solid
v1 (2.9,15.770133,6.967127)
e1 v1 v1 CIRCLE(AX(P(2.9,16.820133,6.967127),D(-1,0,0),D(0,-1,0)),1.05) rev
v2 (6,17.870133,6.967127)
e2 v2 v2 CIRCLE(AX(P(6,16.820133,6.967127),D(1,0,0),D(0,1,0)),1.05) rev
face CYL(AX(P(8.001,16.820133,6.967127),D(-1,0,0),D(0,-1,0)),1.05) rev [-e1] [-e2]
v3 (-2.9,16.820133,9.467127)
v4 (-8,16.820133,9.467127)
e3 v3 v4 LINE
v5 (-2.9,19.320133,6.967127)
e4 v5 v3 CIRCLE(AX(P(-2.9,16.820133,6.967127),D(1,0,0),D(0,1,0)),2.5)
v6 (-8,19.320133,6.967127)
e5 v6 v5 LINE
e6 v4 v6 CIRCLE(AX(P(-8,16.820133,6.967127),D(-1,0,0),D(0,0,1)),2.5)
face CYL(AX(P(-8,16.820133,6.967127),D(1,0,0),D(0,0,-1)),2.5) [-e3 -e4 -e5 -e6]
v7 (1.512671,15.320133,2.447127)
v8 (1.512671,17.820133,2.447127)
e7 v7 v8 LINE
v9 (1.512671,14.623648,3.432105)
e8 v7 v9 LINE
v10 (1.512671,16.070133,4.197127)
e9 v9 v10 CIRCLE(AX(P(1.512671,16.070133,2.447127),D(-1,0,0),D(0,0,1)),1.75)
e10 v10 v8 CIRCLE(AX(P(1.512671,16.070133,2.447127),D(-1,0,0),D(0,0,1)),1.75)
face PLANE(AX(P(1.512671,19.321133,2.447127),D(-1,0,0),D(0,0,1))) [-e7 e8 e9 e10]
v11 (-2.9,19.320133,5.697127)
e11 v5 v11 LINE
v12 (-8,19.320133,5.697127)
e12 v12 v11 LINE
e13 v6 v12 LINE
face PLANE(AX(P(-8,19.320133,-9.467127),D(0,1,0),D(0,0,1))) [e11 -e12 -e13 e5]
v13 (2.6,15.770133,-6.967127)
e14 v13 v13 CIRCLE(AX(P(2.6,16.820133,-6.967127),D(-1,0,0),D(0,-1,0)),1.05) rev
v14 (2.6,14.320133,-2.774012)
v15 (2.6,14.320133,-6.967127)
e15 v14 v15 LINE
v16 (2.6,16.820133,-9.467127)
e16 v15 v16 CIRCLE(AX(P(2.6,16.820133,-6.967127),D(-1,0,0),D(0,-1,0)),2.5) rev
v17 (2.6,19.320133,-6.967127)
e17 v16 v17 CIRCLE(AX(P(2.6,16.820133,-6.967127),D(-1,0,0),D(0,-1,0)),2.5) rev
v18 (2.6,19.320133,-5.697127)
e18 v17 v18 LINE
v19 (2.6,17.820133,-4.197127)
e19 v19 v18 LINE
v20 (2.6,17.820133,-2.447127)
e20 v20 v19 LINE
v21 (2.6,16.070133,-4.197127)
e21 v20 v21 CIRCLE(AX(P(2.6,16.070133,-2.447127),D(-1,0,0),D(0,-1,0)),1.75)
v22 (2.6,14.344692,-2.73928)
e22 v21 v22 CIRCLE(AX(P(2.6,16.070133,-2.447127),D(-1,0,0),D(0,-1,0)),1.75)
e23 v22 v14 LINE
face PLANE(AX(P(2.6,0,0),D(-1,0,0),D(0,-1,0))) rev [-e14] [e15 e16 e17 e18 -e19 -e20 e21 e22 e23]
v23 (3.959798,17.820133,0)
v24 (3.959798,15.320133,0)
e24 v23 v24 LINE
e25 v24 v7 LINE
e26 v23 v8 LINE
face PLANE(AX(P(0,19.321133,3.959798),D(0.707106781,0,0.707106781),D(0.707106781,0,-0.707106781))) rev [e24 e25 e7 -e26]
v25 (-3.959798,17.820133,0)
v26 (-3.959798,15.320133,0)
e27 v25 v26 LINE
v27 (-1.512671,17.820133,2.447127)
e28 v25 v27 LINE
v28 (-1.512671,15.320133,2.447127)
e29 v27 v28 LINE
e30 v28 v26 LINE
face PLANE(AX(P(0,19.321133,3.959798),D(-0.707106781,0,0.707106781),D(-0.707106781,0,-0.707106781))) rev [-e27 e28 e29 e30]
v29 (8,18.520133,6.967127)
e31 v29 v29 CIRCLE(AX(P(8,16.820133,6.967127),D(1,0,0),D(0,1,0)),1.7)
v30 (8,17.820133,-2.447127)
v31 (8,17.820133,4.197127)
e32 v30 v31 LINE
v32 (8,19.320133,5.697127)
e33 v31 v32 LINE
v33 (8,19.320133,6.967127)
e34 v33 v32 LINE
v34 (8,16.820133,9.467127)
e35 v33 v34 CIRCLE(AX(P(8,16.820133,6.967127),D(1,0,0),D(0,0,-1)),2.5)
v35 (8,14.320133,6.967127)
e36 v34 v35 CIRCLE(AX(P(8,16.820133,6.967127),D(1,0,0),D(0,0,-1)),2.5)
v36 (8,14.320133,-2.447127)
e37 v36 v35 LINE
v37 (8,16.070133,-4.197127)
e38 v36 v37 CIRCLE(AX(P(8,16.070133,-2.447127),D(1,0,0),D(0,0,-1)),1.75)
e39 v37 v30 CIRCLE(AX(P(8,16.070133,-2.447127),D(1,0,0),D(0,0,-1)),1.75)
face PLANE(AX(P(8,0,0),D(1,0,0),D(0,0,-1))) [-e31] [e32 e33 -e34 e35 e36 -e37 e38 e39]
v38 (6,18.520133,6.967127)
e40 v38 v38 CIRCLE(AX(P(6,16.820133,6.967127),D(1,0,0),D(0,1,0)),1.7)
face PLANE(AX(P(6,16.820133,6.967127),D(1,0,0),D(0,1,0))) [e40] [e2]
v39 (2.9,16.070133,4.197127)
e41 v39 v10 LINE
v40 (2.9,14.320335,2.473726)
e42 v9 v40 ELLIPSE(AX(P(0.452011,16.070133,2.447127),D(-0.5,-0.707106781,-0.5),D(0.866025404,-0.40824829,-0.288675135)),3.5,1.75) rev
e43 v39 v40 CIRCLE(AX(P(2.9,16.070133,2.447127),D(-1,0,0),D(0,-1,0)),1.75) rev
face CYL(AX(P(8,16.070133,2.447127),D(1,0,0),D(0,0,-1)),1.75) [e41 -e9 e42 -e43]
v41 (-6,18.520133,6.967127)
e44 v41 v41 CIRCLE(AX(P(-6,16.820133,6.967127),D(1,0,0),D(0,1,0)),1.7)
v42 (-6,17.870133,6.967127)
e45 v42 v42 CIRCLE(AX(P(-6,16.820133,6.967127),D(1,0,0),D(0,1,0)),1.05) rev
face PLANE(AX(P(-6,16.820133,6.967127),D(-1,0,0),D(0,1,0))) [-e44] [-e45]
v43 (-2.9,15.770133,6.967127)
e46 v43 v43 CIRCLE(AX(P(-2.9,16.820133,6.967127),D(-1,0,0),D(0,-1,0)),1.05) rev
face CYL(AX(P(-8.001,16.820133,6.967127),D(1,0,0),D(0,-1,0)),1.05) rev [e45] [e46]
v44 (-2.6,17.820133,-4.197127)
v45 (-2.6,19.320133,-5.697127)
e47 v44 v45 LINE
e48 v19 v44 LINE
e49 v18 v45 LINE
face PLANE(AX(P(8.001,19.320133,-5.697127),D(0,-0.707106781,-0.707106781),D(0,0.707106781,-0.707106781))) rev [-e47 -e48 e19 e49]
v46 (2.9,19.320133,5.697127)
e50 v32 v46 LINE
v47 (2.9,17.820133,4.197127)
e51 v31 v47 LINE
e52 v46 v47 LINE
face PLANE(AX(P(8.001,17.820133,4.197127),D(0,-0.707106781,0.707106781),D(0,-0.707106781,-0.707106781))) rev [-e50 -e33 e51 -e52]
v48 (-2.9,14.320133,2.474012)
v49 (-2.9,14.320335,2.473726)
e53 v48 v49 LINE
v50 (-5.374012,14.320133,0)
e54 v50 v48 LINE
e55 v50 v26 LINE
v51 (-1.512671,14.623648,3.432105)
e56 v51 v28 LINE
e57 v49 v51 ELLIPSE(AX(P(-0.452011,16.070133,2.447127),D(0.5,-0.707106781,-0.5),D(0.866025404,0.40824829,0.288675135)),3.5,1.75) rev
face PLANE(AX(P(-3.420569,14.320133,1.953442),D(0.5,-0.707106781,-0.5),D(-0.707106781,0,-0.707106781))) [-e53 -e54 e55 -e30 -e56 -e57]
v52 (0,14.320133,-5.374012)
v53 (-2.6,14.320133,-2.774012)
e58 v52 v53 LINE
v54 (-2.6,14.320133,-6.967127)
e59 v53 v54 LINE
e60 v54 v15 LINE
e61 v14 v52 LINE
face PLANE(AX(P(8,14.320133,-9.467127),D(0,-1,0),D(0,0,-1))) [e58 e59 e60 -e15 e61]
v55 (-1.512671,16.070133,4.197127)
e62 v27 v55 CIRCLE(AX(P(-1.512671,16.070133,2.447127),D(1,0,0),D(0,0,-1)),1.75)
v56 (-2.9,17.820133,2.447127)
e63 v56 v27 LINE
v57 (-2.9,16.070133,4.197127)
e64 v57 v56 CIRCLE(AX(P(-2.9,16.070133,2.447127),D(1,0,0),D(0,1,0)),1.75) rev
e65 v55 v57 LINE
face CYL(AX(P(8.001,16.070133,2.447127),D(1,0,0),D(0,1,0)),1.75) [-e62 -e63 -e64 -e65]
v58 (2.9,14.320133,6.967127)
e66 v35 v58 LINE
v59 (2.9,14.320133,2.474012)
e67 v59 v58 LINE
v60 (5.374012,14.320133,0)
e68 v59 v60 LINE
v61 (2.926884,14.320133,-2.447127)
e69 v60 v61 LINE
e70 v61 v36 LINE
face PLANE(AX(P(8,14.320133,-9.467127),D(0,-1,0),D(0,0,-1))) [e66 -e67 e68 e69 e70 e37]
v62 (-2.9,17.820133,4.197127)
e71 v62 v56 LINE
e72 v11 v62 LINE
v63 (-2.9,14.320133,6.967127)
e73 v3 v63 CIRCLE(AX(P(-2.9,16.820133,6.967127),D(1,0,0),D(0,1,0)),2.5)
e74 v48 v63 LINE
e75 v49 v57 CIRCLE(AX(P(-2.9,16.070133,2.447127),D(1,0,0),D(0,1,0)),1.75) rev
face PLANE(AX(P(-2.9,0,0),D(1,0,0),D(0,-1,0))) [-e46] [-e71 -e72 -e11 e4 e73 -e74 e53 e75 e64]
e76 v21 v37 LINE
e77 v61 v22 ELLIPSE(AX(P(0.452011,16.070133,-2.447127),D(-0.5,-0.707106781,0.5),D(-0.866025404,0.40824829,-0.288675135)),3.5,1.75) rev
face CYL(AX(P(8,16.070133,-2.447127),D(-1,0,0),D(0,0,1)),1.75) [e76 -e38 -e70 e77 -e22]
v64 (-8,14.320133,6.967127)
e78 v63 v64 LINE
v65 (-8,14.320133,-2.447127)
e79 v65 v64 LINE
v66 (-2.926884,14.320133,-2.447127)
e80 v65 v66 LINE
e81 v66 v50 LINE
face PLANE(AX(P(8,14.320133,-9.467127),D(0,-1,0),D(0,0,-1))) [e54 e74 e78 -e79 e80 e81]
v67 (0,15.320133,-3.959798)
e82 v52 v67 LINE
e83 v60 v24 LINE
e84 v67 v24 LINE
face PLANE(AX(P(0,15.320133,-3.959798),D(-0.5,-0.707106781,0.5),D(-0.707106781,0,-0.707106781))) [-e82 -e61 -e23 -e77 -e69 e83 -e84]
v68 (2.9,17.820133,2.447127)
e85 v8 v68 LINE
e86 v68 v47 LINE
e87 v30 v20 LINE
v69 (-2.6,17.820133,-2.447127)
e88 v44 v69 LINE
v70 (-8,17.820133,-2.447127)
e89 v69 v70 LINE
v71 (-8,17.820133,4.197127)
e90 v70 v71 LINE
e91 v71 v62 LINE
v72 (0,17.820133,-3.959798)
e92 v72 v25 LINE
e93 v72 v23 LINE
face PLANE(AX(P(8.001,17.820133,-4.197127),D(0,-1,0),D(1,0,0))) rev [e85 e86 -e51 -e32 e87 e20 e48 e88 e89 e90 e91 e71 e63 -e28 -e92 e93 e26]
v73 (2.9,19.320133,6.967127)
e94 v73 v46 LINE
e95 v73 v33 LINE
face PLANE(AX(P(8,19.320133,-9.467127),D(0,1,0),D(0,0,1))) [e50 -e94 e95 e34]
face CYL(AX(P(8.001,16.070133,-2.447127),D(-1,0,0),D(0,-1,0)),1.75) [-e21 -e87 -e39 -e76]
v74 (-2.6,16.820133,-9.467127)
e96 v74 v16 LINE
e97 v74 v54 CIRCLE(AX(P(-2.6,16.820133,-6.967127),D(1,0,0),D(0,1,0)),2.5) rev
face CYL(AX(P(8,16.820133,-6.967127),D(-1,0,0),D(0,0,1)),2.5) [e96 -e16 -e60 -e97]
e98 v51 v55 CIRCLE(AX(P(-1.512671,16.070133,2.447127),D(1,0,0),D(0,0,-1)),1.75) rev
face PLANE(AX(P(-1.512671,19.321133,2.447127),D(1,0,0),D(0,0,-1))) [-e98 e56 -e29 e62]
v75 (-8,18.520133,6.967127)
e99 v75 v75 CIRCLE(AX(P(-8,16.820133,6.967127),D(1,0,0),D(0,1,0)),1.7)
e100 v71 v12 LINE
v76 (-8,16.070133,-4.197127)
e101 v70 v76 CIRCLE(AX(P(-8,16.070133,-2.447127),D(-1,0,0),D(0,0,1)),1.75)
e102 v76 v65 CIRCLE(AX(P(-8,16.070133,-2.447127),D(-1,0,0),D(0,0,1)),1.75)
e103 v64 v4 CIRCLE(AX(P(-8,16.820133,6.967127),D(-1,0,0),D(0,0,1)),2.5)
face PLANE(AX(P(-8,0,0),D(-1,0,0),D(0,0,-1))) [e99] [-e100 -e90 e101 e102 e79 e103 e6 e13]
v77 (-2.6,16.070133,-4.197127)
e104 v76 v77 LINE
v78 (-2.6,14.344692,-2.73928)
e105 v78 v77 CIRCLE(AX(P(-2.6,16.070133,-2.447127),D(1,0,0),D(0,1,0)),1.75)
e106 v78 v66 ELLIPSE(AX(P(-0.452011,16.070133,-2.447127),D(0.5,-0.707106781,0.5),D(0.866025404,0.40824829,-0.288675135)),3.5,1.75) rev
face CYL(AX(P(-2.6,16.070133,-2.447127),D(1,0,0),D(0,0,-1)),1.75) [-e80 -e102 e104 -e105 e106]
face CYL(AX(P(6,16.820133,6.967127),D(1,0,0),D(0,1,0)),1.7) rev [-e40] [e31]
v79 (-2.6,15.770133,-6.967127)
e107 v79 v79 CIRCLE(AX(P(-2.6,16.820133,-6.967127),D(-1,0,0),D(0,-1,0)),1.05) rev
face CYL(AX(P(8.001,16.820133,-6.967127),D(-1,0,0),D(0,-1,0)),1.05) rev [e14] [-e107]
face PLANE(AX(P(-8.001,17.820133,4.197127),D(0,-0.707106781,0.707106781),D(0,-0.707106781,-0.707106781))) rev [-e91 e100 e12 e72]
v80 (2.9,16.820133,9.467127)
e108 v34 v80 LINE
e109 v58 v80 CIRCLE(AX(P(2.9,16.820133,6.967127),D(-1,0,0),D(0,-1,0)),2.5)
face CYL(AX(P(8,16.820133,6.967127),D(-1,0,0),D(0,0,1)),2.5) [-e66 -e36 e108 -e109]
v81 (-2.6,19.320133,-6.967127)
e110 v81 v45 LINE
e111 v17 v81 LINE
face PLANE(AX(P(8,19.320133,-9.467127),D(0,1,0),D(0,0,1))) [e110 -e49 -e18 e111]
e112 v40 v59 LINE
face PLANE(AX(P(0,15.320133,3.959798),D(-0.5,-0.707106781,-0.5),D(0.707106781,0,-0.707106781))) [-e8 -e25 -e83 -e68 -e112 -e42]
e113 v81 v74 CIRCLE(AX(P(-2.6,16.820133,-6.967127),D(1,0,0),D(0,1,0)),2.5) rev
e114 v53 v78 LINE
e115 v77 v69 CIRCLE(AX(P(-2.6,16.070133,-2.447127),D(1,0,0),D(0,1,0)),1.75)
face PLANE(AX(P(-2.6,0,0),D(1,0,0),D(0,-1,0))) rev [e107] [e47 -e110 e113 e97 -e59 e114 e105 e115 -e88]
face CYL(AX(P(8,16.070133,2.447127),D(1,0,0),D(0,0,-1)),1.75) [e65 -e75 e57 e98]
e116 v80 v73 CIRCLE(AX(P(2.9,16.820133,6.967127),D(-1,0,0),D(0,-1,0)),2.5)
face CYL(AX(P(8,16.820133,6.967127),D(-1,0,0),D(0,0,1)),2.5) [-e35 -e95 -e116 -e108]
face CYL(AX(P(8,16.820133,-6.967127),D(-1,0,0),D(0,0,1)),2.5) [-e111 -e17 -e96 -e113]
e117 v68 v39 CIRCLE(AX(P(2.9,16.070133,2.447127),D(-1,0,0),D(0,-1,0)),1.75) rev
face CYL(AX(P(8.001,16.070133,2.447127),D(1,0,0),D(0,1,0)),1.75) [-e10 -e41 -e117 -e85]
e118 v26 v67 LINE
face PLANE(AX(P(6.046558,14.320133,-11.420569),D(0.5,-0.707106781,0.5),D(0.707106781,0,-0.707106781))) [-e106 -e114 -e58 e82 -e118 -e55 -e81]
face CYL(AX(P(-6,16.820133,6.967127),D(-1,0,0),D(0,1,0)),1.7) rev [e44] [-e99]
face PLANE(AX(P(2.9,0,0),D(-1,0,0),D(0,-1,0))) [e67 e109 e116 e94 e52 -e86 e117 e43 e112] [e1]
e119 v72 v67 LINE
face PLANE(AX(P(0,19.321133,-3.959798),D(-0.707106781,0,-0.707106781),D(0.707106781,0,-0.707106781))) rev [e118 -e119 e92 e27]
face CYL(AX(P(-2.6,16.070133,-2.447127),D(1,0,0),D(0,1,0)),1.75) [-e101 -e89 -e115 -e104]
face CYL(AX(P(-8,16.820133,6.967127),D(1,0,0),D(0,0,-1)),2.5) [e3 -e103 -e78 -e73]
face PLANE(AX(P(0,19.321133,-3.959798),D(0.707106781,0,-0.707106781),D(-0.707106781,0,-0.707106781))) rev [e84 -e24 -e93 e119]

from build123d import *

# Parameters (mm, degrees)
SKETCH3_W           = 18.934254216
SKETCH3_H           = 5
BOSS_EXTRUDE1_DEPTH = 8
CUT_EXTRUDE1_REACH  = 24.954
SKETCH5_R           = 1.05
SKETCH4_W           = 5.27
SKETCH4_H           = 5
CUT_EXTRUDE2_DEPTH  = 2.9
SKETCH6_W           = 5.27
SKETCH6_H           = 5
CUT_EXTRUDE3_DEPTH  = 5.4
CUT_EXTRUDE5_REACH  = 15.365
CUT_EXTRUDE6_REACH  = 24.954
SKETCH10_R          = 1.7
CUT_EXTRUDE9_DEPTH  = 2
FILLET1_R           = 2.5
FILLET2_R           = 1.75
CUT_EXTRUDE7_REACH  = 15.365
SKETCH8_W           = 3.025341734
SKETCH8_H           = 1.75
CHAMFER1_SIZE       = 1


with BuildPart() as part:
    # Sketch3 → Boss-Extrude1 (new body)
    with BuildSketch(Plane.ZY):
        with Locations((0, 16.820132754)):
            Rectangle(SKETCH3_W, SKETCH3_H)
    extrude(amount=-BOSS_EXTRUDE1_DEPTH)

    # Sketch5 → Cut-Extrude1 (cut, up to next)
    with BuildSketch(Plane.ZY, mode=Mode.PRIVATE) as cut_extrude1_sk1:
        with Locations(Location((6.967127108, 16.820132754, 0), (0, 0, 270))):
            Circle(SKETCH5_R)
    cut_extrude1_tool1 = extrude(cut_extrude1_sk1.sketch, amount=-CUT_EXTRUDE1_REACH, mode=Mode.PRIVATE) & part.part
    # Sketch5 → Cut-Extrude1 (cut, up to next)
    with BuildSketch(Plane.ZY, mode=Mode.PRIVATE) as cut_extrude1_sk2:
        with Locations(Location((-6.967127108, 16.820132754, 0), (0, 0, 270))):
            Circle(SKETCH5_R)
    cut_extrude1_tool2 = extrude(cut_extrude1_sk2.sketch, amount=-CUT_EXTRUDE1_REACH, mode=Mode.PRIVATE) & part.part
    add(cut_extrude1_tool1.solids().sort_by_distance((0, 16.820133, 6.967127))[0], mode=Mode.SUBTRACT)
    add(cut_extrude1_tool2.solids().sort_by_distance((0, 16.820133, -6.967127))[0], mode=Mode.SUBTRACT)

    # Sketch4 → Cut-Extrude2 (cut)
    with BuildSketch(Plane.ZY):
        with Locations((6.832127108, 16.820132754)):
            Rectangle(SKETCH4_W, SKETCH4_H)
    extrude(amount=-CUT_EXTRUDE2_DEPTH, mode=Mode.SUBTRACT)

    # Sketch6 → Cut-Extrude3 (cut)
    with BuildSketch(Plane(origin=(8, 0, 0), x_dir=(0, 0, -1), z_dir=(1, 0, 0))):
        with Locations((6.832127108, 16.820132754)):
            Rectangle(SKETCH6_W, SKETCH6_H)
    extrude(amount=-CUT_EXTRUDE3_DEPTH, mode=Mode.SUBTRACT)

    # Sketch1 → Cut-Extrude5 (cut, up to next)
    with BuildSketch(Plane(origin=(0, 14.320132754, 0), x_dir=(-1, 0, 0), z_dir=(0, -1, 0)), mode=Mode.PRIVATE) as cut_extrude5_sk1:
        Polygon((3.959797975, 0), (0, -3.959797975), (-3.959797975, 0), (0, 3.959797975), align=None)
    cut_extrude5_tool1 = extrude(cut_extrude5_sk1.sketch, amount=-CUT_EXTRUDE5_REACH, mode=Mode.PRIVATE) & part.part
    add(cut_extrude5_tool1.solids().sort_by_distance((0, 14.320133, 0))[0], mode=Mode.SUBTRACT)

    # Sketch7 → Cut-Extrude6 (cut, up to next)
    with BuildSketch(Plane.ZY, mode=Mode.PRIVATE) as cut_extrude6_sk1:
        Polygon((-4.197127108, 17.820132754), (4.197127108, 17.820132754), (5.697127108, 19.320132754), (-5.697127108, 19.320132754), align=None)
    cut_extrude6_tool1 = extrude(cut_extrude6_sk1.sketch, amount=-CUT_EXTRUDE6_REACH, mode=Mode.PRIVATE) & part.part
    add(cut_extrude6_tool1.solids().sort_by_distance((0, 18.608034, 0))[0], mode=Mode.SUBTRACT)

    # Sketch10 → Cut-Extrude9 (cut)
    with BuildSketch(Plane(origin=(8, 0, 0), x_dir=(0, 0, -1), z_dir=(1, 0, 0))):
        with Locations(Location((-6.967127108, 16.820132754, 0), (0, 0, 90))):
            Circle(SKETCH10_R)
    extrude(amount=-CUT_EXTRUDE9_DEPTH, mode=Mode.SUBTRACT)

    # Mirror2: part across plane


with BuildPart() as part_1:
    add(part.part)
    add(part.part.mirror(Plane(origin=(0, 0, 0), x_dir=(0, 0, 1), z_dir=(1, 0, 0))))

    # Fillet1
    # the kernel refuses this fillet: 2.5 mm, written as the material it takes off along each edge
    with BuildSketch(Plane(origin=(3.35, 14.320132754, 9.467127108), x_dir=(0, 0, -1), z_dir=(-1, 0, 0)), Plane(origin=(-3.35, 19.320132754, 9.467127108), x_dir=(0, 0, -1), z_dir=(1, 0, 0))) as fillet1_piece_1:
        with BuildLine():
            CenterArc((FILLET1_R, -FILLET1_R), FILLET1_R, 90, 90)
            Line((0, -FILLET1_R), (0, 0))
            Line((0, 0), (FILLET1_R, 0))
        make_face()
    extrude(amount=17.6, mode=Mode.SUBTRACT)
    with BuildSketch(Plane(origin=(3.35, 19.320132754, 9.467127108), x_dir=(0, 0, -1), z_dir=(-1, 0, 0)), Plane(origin=(-3.35, 14.320132754, 9.467127108), x_dir=(0, 0, -1), z_dir=(1, 0, 0))) as fillet1_piece_2:
        with BuildLine():
            CenterArc((FILLET1_R, FILLET1_R), FILLET1_R, 180, 90)
            Line((0, FILLET1_R), (0, 0))
            Line((0, 0), (FILLET1_R, 0))
        make_face()
    extrude(amount=17.6, mode=Mode.SUBTRACT)
    with BuildSketch(Plane(origin=(-8.85, 14.320132754, -9.467127108), x_dir=(0, 0, 1), z_dir=(1, 0, 0))) as fillet1_piece_3:
        with BuildLine():
            CenterArc((FILLET1_R, -FILLET1_R), FILLET1_R, 90, 90)
            Line((0, -FILLET1_R), (0, 0))
            Line((0, 0), (FILLET1_R, 0))
        make_face()
    extrude(amount=17.7, mode=Mode.SUBTRACT)
    with BuildSketch(Plane(origin=(-8.85, 19.320132754, -9.467127108), x_dir=(0, 0, 1), z_dir=(1, 0, 0))) as fillet1_piece_4:
        with BuildLine():
            CenterArc((FILLET1_R, FILLET1_R), FILLET1_R, 180, 90)
            Line((0, FILLET1_R), (0, 0))
            Line((0, 0), (FILLET1_R, 0))
        make_face()
    extrude(amount=17.7, mode=Mode.SUBTRACT)

    # Fillet2
    # the kernel refuses this fillet: 1.75 mm, written as the material it takes off along each edge
    with BuildSketch(Plane(origin=(2.9, 14.320132754, 4.197127108), x_dir=(0, 0, -1), z_dir=(-1, 0, 0))) as fillet2_piece_1:
        with BuildLine():
            CenterArc((FILLET2_R, -FILLET2_R), FILLET2_R, 90, 90)
            Line((0, -FILLET2_R), (0, 0))
            Line((0, 0), (FILLET2_R, 0))
        make_face()
    extrude(amount=5.8, mode=Mode.SUBTRACT)
    with BuildSketch(Plane(origin=(2.9, 17.820132754, 4.197127108), x_dir=(0, 0, -1), z_dir=(-1, 0, 0))) as fillet2_piece_2:
        with BuildLine():
            CenterArc((FILLET2_R, FILLET2_R), FILLET2_R, 180, 90)
            Line((0, FILLET2_R), (0, 0))
            Line((0, 0), (FILLET2_R, 0))
        make_face()
    extrude(amount=5.8, mode=Mode.SUBTRACT)
    with BuildSketch(Plane(origin=(12.375, 14.320132754, -4.197127108), x_dir=(0, 0, 1), z_dir=(-1, 0, 0)), Plane(origin=(2.6, 17.820132754, -4.197127108), x_dir=(0, 0, 1), z_dir=(1, 0, 0))) as fillet2_piece_3:
        with BuildLine():
            CenterArc((FILLET2_R, FILLET2_R), FILLET2_R, 180, 90)
            Line((0, FILLET2_R), (0, 0))
            Line((0, 0), (FILLET2_R, 0))
        make_face()
    extrude(amount=9.775, mode=Mode.SUBTRACT)
    with BuildSketch(Plane(origin=(-12.375, 14.320132754, -4.197127108), x_dir=(0, 0, 1), z_dir=(1, 0, 0)), Plane(origin=(-2.6, 17.820132754, -4.197127108), x_dir=(0, 0, 1), z_dir=(-1, 0, 0))) as fillet2_piece_4:
        with BuildLine():
            CenterArc((FILLET2_R, -FILLET2_R), FILLET2_R, 90, 90)
            Line((0, -FILLET2_R), (0, 0))
            Line((0, 0), (FILLET2_R, 0))
        make_face()
    extrude(amount=9.775, mode=Mode.SUBTRACT)

    # Sketch8 → Cut-Extrude7 (cut, up to next)
    with BuildSketch(Plane(origin=(0, 14.320132754, 0), x_dir=(1, 0, 0), z_dir=(0, 1, 0)), mode=Mode.PRIVATE) as cut_extrude7_sk1:
        with Locations((0, -3.322127108)):
            Rectangle(SKETCH8_W, SKETCH8_H)
    cut_extrude7_tool1 = extrude(cut_extrude7_sk1.sketch, amount=CUT_EXTRUDE7_REACH, mode=Mode.PRIVATE) & part_1.part
    add(cut_extrude7_tool1.solids().sort_by_distance((0, 14.320133, 3.322127))[0], mode=Mode.SUBTRACT)

    # Chamfer1
    # the kernel refuses this chamfer: 1 mm, written as the material it takes off along each edge
    with BuildSketch(Plane(origin=(0.305783613, 14.320132754, 4.265581587), x_dir=(-0.7068394360706736, -0.027495876610585612, 0.7068394360706735), z_dir=(-0.7071067811865476, 0, -0.7071067811865476))) as chamfer1_piece_1:
        Polygon((CHAMFER1_SIZE * 0.999621916911, CHAMFER1_SIZE * 0.0274958766106), (-CHAMFER1_SIZE * 0.0274958766106, CHAMFER1_SIZE * 0.999621916911), (0, 0), align=None)
    extrude(amount=6.032443332, mode=Mode.SUBTRACT)
    with BuildSketch(Plane(origin=(-0.305783613, 14.320132754, 4.265581587), x_dir=(0.7068394360706735, -0.027495876610585612, 0.7068394360706735), z_dir=(0.7071067811865476, 0, -0.7071067811865476))) as chamfer1_piece_2:
        Polygon((CHAMFER1_SIZE * 0.999621916911, -CHAMFER1_SIZE * 0.0274958766106), (-CHAMFER1_SIZE * 0.0274958766106, -CHAMFER1_SIZE * 0.999621916911), (0, 0), align=None)
    extrude(amount=6.032443332, mode=Mode.SUBTRACT)
    with BuildSketch(Plane(origin=(3.959797975, 14.320132754, 0), x_dir=(0.7068394360706735, -0.027495876610590834, -0.7068394360706735), z_dir=(-0.7071067811865476, 0, -0.7071067811865476))) as chamfer1_piece_3:
        Polygon((CHAMFER1_SIZE * 0.999621916911, -CHAMFER1_SIZE * 0.0274958766106), (-CHAMFER1_SIZE * 0.0274958766106, -CHAMFER1_SIZE * 0.999621916911), (0, 0), align=None)
    extrude(amount=5.6, mode=Mode.SUBTRACT)
    with BuildSketch(Plane(origin=(-3.959797975, 14.320132754, 0), x_dir=(-0.7068394360706735, -0.027495876610590834, -0.7068394360706735), z_dir=(0.7071067811865476, 0, -0.7071067811865476))) as chamfer1_piece_4:
        Polygon((CHAMFER1_SIZE * 0.999621916911, CHAMFER1_SIZE * 0.0274958766106), (-CHAMFER1_SIZE * 0.0274958766106, CHAMFER1_SIZE * 0.999621916911), (0, 0), align=None)
    extrude(amount=5.6, mode=Mode.SUBTRACT)
    with BuildSketch(Plane(origin=(-5.778252454, 14.320132754, 1.81845448), x_dir=(-0.7068394360706735, -0.027495876610585616, -0.7068394360706735), z_dir=(0.7071067811865476, 0, -0.7071067811865476))) as chamfer1_piece_5a_section:
        Polygon((CHAMFER1_SIZE * 0.999621916911, CHAMFER1_SIZE * 0.0274958766106), (-CHAMFER1_SIZE * 0.0274958766106, CHAMFER1_SIZE * 0.999621916911), (0, 0), align=None)
    chamfer1_piece_5a = extrude(amount=8.171682988, mode=Mode.PRIVATE)
    chamfer1_piece_5a = split(chamfer1_piece_5a, bisect_by=Plane(origin=(-4.192997285, 14.649926381, -0.23319931), z_dir=(-0.7071067811865476, 0, 0.7071067811865476)), keep=Keep.TOP, mode=Mode.PRIVATE)
    with BuildSketch(Plane(origin=(0.305783613, 14.320132754, 4.265581587), x_dir=(-0.7068394360706736, -0.027495876610585612, 0.7068394360706735), z_dir=(-0.7071067811865476, 0, -0.7071067811865476))) as chamfer1_piece_5b_section:
        Polygon((CHAMFER1_SIZE * 0.999621916911, CHAMFER1_SIZE * 0.0274958766106), (-CHAMFER1_SIZE * 0.0274958766106, CHAMFER1_SIZE * 0.999621916911), (0, 0), align=None)
    chamfer1_piece_5b = extrude(amount=8.60412632, mode=Mode.PRIVATE)
    chamfer1_piece_5b = split(chamfer1_piece_5b, bisect_by=Plane(origin=(-4.192997285, 14.649926381, 0.23319931), z_dir=(-0.7071067811865476, 0, -0.7071067811865476)), keep=Keep.TOP, mode=Mode.PRIVATE)
    chamfer1_piece_5 = chamfer1_piece_5a & chamfer1_piece_5b
    add(chamfer1_piece_5, mode=Mode.SUBTRACT)
    with BuildSketch(Plane(origin=(-0.305783613, 14.320132754, 4.265581587), x_dir=(0.7068394360706735, -0.027495876610585612, 0.7068394360706735), z_dir=(0.7071067811865476, 0, -0.7071067811865476))) as chamfer1_piece_6a_section:
        Polygon((CHAMFER1_SIZE * 0.999621916911, -CHAMFER1_SIZE * 0.0274958766106), (-CHAMFER1_SIZE * 0.0274958766106, -CHAMFER1_SIZE * 0.999621916911), (0, 0), align=None)
    chamfer1_piece_6a = extrude(amount=8.60412632, mode=Mode.PRIVATE)
    chamfer1_piece_6a = split(chamfer1_piece_6a, bisect_by=Plane(origin=(4.192997285, 14.649926381, 0.23319931), z_dir=(0.7071067811865476, 0, -0.7071067811865476)), keep=Keep.TOP, mode=Mode.PRIVATE)
    with BuildSketch(Plane(origin=(5.778252454, 14.320132754, 1.81845448), x_dir=(0.7068394360706736, -0.027495876610585605, -0.7068394360706736), z_dir=(-0.7071067811865476, 0, -0.7071067811865476))) as chamfer1_piece_6b_section:
        Polygon((CHAMFER1_SIZE * 0.999621916911, -CHAMFER1_SIZE * 0.0274958766106), (-CHAMFER1_SIZE * 0.0274958766106, -CHAMFER1_SIZE * 0.999621916911), (0, 0), align=None)
    chamfer1_piece_6b = extrude(amount=8.171682988, mode=Mode.PRIVATE)
    chamfer1_piece_6b = split(chamfer1_piece_6b, bisect_by=Plane(origin=(4.192997285, 14.649926381, -0.23319931), z_dir=(0.7071067811865476, 0, 0.7071067811865476)), keep=Keep.TOP, mode=Mode.PRIVATE)
    chamfer1_piece_6 = chamfer1_piece_6a & chamfer1_piece_6b
    add(chamfer1_piece_6, mode=Mode.SUBTRACT)
    with BuildSketch(Plane(origin=(3.959797975, 14.320132754, 0), x_dir=(0.7068394360706735, -0.027495876610590834, -0.7068394360706735), z_dir=(-0.7071067811865476, 0, -0.7071067811865476))) as chamfer1_piece_7a_section:
        Polygon((CHAMFER1_SIZE * 0.999621916911, -CHAMFER1_SIZE * 0.0274958766106), (-CHAMFER1_SIZE * 0.0274958766106, -CHAMFER1_SIZE * 0.999621916911), (0, 0), align=None)
    chamfer1_piece_7a = extrude(amount=8.171682988, mode=Mode.PRIVATE)
    chamfer1_piece_7a = split(chamfer1_piece_7a, bisect_by=Plane(origin=(0.23319931, 14.649926381, -4.192997285), z_dir=(-0.7071067811865476, 0, -0.7071067811865476)), keep=Keep.TOP, mode=Mode.PRIVATE)
    with BuildSketch(Plane(origin=(-3.959797975, 14.320132754, 0), x_dir=(-0.7068394360706735, -0.027495876610590834, -0.7068394360706735), z_dir=(0.7071067811865476, 0, -0.7071067811865476))) as chamfer1_piece_7b_section:
        Polygon((CHAMFER1_SIZE * 0.999621916911, CHAMFER1_SIZE * 0.0274958766106), (-CHAMFER1_SIZE * 0.0274958766106, CHAMFER1_SIZE * 0.999621916911), (0, 0), align=None)
    chamfer1_piece_7b = extrude(amount=8.171682988, mode=Mode.PRIVATE)
    chamfer1_piece_7b = split(chamfer1_piece_7b, bisect_by=Plane(origin=(-0.23319931, 14.649926381, -4.192997285), z_dir=(0.7071067811865476, 0, -0.7071067811865476)), keep=Keep.TOP, mode=Mode.PRIVATE)
    chamfer1_piece_7 = chamfer1_piece_7a & chamfer1_piece_7b
    add(chamfer1_piece_7, mode=Mode.SUBTRACT)


solid = part_1.part
